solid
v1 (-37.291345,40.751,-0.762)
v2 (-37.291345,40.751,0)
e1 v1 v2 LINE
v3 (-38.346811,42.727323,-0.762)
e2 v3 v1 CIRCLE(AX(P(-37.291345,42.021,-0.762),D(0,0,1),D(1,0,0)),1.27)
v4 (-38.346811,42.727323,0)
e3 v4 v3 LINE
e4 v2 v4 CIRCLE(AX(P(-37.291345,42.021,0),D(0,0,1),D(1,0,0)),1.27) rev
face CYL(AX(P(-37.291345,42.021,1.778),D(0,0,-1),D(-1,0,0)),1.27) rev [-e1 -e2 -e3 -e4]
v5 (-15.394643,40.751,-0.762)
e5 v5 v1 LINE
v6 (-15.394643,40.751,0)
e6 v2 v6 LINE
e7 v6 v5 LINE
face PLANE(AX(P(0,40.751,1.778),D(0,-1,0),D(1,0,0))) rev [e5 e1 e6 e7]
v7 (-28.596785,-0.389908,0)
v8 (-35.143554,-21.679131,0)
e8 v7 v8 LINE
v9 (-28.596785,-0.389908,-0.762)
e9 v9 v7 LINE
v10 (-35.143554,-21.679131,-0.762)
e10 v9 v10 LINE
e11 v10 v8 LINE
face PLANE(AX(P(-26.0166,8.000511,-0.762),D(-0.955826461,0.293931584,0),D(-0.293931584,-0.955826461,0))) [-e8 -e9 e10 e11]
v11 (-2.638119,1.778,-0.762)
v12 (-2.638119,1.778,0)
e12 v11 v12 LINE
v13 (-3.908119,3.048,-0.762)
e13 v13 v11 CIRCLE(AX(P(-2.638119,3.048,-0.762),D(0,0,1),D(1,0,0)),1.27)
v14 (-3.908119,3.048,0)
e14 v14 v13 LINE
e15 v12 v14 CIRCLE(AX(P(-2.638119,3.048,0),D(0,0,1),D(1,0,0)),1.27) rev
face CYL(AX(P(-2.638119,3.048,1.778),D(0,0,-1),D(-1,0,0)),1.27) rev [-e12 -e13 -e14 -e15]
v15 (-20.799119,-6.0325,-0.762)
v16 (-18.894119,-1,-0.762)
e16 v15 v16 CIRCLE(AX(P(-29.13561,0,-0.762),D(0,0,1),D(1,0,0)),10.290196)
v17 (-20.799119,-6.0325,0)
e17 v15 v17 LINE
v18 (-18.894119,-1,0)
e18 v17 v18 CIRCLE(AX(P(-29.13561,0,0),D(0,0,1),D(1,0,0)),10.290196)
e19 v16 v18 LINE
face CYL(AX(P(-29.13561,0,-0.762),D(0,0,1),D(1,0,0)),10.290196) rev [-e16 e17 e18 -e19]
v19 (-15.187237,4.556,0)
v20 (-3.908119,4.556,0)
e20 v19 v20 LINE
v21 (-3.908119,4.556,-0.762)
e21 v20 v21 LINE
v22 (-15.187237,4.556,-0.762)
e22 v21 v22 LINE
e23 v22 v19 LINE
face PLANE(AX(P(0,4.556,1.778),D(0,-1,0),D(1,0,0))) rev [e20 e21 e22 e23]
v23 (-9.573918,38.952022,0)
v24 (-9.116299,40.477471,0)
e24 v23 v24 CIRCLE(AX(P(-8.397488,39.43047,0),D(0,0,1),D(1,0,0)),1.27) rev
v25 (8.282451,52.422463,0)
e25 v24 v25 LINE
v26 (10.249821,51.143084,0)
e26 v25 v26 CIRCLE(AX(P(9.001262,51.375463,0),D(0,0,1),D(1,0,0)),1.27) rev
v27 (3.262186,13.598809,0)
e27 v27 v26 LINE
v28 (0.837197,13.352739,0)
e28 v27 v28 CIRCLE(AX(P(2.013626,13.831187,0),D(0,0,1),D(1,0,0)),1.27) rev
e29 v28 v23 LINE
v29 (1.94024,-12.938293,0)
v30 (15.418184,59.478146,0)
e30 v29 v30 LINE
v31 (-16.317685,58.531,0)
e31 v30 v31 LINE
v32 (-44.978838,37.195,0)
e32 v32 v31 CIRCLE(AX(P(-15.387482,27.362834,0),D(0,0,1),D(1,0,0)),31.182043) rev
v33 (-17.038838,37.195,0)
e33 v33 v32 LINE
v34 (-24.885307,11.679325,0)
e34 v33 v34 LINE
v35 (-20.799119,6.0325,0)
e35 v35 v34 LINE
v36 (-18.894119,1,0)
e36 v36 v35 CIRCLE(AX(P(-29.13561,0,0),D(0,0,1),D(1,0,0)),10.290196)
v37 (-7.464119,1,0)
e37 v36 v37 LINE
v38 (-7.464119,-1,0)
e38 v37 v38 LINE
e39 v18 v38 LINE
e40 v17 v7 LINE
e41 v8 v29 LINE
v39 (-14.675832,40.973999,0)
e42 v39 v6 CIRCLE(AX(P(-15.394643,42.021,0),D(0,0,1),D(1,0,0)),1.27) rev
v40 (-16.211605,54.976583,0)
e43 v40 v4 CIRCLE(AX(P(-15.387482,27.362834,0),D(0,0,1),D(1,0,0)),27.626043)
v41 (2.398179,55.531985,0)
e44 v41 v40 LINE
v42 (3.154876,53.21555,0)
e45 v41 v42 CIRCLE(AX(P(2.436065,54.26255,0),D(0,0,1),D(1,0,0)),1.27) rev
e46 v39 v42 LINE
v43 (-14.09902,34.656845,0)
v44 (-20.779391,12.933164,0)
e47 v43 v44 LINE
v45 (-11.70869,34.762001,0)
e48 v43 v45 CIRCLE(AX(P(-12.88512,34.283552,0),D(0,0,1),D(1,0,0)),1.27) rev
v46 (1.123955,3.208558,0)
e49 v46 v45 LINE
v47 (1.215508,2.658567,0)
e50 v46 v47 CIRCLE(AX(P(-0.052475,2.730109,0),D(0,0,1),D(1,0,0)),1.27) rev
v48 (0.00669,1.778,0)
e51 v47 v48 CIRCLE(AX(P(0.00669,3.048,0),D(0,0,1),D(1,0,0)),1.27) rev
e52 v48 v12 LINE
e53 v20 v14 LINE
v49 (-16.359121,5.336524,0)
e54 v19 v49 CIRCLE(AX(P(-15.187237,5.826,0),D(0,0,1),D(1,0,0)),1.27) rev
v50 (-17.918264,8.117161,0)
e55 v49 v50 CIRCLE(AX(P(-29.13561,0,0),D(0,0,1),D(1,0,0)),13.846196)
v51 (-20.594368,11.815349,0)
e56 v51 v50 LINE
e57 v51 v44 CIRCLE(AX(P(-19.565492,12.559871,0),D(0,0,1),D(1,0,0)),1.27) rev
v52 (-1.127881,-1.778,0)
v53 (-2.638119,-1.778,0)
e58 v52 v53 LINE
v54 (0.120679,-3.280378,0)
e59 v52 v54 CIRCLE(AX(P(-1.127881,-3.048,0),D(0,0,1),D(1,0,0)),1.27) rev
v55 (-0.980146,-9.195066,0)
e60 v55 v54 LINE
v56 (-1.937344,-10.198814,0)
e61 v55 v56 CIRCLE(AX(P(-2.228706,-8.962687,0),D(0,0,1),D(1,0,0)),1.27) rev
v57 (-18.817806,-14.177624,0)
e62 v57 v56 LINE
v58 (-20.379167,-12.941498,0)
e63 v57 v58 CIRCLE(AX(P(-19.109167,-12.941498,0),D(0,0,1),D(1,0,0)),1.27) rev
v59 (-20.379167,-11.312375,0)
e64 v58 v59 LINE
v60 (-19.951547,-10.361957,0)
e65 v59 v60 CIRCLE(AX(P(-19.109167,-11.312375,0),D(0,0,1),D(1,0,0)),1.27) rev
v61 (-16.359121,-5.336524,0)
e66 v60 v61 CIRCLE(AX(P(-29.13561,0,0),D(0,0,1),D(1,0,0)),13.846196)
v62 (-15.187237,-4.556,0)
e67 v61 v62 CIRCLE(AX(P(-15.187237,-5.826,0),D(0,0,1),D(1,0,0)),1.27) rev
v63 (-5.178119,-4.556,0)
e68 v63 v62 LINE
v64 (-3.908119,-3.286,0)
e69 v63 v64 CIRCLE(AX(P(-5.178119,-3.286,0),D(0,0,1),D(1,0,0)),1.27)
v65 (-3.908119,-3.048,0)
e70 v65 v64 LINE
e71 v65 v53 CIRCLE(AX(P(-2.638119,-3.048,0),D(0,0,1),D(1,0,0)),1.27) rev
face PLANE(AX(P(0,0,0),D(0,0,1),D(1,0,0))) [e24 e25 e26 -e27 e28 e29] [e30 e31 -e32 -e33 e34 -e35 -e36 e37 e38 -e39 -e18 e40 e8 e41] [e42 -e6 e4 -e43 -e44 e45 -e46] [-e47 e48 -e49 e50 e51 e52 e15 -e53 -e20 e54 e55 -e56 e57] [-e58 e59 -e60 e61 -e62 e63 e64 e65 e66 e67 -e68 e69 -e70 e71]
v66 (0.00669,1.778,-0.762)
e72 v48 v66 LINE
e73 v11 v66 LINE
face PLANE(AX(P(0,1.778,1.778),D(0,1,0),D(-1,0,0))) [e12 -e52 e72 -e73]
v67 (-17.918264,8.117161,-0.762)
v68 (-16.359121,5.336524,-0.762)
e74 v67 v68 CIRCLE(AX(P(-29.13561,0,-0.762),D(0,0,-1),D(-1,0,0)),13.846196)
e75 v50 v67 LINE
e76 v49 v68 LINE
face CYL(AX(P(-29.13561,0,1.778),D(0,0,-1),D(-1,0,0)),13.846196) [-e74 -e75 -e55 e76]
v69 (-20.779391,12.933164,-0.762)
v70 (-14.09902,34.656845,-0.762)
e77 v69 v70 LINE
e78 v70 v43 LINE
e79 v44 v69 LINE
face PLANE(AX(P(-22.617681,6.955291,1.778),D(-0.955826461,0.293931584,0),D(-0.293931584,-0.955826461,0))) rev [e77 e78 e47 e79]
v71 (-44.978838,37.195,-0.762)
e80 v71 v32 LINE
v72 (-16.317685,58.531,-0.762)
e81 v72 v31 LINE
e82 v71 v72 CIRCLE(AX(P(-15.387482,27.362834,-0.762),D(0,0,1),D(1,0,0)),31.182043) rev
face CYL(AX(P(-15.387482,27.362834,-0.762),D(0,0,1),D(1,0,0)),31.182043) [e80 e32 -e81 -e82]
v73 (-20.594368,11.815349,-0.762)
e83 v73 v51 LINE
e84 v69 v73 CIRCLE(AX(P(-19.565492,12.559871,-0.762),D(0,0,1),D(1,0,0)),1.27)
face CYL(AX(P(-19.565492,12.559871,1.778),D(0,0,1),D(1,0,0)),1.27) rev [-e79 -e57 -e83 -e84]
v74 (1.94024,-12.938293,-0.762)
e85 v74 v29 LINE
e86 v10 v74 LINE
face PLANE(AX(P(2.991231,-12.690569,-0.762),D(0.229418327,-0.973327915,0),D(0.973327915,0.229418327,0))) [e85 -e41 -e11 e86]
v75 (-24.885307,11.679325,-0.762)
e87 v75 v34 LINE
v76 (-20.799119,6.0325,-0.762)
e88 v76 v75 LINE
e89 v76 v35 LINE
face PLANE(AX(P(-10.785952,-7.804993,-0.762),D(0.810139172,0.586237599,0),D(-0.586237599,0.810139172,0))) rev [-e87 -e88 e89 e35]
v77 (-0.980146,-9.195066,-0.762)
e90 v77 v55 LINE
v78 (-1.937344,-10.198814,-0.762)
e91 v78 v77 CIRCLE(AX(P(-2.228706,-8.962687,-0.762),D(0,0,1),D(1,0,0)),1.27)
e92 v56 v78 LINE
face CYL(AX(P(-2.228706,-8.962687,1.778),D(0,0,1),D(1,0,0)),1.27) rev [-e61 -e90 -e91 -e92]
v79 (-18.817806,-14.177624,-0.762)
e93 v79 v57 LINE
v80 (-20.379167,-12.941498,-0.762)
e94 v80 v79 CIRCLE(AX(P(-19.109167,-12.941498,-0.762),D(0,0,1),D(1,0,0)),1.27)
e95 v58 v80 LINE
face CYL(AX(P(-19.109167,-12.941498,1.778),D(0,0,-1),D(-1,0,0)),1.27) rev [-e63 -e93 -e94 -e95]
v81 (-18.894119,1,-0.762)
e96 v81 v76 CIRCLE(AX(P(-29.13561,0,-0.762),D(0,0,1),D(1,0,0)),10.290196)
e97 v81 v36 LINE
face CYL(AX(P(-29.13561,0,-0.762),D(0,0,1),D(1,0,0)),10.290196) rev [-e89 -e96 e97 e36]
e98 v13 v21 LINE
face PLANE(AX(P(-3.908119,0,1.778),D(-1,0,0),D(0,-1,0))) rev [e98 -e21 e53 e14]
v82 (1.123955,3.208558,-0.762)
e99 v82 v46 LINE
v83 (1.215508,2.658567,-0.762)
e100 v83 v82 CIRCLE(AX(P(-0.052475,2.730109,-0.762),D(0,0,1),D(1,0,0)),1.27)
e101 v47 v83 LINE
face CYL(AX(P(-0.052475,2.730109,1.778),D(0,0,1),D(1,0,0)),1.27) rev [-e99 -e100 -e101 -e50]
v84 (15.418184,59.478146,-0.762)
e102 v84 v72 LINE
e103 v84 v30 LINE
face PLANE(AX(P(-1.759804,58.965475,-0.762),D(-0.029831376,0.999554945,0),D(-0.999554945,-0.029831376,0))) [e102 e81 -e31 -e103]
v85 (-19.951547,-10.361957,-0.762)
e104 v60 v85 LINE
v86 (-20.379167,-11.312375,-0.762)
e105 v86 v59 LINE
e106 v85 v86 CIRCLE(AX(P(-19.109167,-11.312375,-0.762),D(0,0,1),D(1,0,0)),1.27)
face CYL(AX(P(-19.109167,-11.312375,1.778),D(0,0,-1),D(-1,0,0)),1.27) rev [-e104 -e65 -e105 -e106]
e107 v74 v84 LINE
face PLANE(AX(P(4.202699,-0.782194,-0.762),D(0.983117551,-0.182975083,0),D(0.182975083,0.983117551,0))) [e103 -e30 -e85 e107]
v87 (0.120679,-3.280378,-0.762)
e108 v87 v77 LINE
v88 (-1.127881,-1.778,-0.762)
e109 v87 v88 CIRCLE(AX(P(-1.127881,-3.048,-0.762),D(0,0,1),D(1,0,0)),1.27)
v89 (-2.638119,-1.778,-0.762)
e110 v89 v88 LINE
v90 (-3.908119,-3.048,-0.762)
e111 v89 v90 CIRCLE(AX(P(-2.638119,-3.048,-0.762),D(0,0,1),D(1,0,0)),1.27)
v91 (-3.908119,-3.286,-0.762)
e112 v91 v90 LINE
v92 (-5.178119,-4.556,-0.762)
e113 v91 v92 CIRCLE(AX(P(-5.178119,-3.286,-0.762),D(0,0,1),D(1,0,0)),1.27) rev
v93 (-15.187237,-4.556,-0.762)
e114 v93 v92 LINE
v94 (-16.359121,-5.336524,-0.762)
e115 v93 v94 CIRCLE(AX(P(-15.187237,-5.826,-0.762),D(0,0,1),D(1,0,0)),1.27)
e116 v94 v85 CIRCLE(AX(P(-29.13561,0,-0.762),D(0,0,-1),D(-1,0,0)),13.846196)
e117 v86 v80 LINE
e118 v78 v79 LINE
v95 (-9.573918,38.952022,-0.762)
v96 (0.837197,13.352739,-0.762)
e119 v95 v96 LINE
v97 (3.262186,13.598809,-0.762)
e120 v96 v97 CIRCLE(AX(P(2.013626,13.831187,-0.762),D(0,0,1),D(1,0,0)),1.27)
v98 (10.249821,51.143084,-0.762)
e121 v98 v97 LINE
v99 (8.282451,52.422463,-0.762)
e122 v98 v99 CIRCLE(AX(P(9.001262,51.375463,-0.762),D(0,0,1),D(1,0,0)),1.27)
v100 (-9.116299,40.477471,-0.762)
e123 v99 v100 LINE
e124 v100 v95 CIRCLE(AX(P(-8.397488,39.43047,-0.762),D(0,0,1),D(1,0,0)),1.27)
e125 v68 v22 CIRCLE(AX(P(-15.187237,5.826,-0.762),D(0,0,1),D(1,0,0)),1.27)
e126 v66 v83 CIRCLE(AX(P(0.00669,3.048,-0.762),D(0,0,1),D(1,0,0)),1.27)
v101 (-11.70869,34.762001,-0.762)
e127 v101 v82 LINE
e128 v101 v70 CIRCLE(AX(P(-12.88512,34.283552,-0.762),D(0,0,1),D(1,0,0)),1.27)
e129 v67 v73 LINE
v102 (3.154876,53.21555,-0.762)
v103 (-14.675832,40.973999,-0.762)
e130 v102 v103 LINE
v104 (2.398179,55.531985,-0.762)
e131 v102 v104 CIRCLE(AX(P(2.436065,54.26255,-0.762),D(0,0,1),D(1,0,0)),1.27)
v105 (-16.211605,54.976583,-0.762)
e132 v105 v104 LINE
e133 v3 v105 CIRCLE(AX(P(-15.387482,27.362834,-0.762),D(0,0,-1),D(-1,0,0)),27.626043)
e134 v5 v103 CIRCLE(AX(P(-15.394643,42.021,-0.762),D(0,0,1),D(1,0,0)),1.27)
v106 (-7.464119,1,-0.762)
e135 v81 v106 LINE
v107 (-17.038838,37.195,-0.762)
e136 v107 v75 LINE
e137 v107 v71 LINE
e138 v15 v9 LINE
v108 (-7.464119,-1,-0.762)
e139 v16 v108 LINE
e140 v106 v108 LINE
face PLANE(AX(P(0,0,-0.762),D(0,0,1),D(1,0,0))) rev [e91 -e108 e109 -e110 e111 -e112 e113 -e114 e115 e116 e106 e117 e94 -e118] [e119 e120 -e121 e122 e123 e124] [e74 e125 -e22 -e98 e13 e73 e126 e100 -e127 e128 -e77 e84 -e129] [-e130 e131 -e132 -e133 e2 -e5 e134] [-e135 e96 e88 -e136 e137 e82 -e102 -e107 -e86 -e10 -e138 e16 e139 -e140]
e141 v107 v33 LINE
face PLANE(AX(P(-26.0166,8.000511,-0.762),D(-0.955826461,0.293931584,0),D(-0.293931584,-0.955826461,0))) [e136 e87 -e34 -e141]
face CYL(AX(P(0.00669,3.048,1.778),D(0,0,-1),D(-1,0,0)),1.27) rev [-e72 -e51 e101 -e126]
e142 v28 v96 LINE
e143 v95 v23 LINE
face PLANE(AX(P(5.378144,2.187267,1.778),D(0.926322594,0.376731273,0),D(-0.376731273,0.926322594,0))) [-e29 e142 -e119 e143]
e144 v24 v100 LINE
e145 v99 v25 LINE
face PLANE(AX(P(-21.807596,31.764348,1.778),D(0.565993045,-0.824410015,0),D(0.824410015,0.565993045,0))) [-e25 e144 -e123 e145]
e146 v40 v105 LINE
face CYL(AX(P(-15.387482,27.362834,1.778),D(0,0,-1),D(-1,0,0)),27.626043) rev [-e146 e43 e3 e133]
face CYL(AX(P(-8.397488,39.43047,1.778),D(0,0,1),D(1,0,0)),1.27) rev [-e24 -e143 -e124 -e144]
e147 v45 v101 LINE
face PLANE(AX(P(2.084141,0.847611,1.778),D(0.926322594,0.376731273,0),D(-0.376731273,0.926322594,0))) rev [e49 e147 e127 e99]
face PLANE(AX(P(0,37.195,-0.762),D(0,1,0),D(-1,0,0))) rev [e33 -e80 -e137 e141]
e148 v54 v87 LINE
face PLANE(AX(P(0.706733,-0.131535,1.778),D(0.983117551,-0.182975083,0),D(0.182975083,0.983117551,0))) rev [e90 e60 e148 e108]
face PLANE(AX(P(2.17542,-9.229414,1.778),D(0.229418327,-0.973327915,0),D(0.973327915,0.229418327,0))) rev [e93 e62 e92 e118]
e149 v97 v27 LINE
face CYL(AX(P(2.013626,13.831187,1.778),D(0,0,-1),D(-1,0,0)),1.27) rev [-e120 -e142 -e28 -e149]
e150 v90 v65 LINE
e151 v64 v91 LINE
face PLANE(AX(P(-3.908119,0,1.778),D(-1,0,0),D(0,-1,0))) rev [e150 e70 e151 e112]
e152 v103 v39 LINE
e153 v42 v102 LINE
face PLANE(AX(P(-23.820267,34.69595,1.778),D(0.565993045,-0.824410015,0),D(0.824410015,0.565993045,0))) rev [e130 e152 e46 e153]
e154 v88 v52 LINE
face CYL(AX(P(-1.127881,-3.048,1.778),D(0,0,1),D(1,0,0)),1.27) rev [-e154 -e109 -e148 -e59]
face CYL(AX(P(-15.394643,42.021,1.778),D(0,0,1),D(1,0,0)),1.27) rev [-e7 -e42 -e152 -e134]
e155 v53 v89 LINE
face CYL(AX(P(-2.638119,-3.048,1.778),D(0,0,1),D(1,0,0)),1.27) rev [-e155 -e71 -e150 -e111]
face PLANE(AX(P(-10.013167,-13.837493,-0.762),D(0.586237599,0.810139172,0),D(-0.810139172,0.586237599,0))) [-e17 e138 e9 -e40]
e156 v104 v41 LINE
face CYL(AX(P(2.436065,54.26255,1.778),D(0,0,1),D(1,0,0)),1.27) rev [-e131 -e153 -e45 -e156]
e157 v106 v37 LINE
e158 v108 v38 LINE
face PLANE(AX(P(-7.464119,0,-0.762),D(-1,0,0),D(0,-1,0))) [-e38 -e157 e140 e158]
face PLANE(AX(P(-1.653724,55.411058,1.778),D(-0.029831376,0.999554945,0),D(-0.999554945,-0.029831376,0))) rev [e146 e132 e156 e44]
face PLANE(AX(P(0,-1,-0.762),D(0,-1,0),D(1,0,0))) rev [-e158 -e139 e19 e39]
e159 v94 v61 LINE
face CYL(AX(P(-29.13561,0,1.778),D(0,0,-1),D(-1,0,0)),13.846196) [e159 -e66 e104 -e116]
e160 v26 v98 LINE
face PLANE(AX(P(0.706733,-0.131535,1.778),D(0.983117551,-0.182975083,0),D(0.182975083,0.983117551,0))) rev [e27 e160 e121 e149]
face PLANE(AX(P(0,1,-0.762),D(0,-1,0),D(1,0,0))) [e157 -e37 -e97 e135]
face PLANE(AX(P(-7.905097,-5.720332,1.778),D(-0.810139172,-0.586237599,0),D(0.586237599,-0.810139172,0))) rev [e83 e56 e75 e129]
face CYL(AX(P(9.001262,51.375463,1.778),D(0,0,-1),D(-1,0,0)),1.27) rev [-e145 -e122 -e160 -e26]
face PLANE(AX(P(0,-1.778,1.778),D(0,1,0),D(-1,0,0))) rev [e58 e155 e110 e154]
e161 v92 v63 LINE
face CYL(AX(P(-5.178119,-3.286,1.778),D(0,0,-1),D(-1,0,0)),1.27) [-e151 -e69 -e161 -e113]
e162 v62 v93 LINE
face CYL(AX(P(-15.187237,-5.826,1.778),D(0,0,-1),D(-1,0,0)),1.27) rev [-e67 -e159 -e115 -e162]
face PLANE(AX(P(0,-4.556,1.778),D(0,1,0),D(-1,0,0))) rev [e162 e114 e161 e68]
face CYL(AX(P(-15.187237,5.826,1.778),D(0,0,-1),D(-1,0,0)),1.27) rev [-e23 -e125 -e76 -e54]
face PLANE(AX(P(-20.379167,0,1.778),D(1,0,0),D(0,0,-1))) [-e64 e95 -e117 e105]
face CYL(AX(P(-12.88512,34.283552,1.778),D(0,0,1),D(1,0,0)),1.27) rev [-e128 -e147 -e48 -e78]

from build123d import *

# Parameters (mm, degrees)
BOSS_EXTRUDE2_DEPTH = 0.762
CUT_EXTRUDE1_DEPTH  = 2.54
FILLET1_R           = 1.27
FILLET2_R           = 1.27


with BuildPart() as part:
    # Sketch1 → Boss-Extrude2 (new body)
    with BuildSketch(Plane.XY):
        with BuildLine():
            Line((-17.038837989, 37.195), (-24.885307058, 11.67932501))
            Line((-24.885307058, 11.67932501), (-20.799118841, 6.0325))
            ThreePointArc((-20.799118841, 6.0325), (-19.511844062, 3.642975475), (-18.894118841, 1))
            Line((-18.894118841, 1), (-7.464118841, 1))
            Line((-7.464118841, 1), (-7.464118841, -1))
            Line((-7.464118841, -1), (-18.894118841, -1))
            ThreePointArc((-18.894118841, -1), (-19.511844062, -3.642975475), (-20.799118841, -6.0325))
            Line((-20.799118841, -6.0325), (-28.596784868, -0.38990775))
            Line((-28.596784868, -0.38990775), (-35.143553898, -21.67913088))
            Line((-35.143553898, -21.67913088), (1.940239682, -12.938292607))
            Line((1.940239682, -12.938292607), (15.418184296, 59.478146197))
            Line((15.418184296, 59.478146197), (-16.317685222, 58.531))
            ThreePointArc((-16.317685222, 58.531), (-34.007299879, 52.375275454), (-44.978837989, 37.195))
            Line((-44.978837989, 37.195), (-17.038837989, 37.195))
        make_face()
    extrude(amount=-BOSS_EXTRUDE2_DEPTH)

    # Sketch2 → Cut-Extrude1 (cut)
    with BuildSketch(Plane(origin=(0, 0, -0.762), x_dir=(-1, 0, 0), z_dir=(0, 0, -1))):
        Polygon((9.959013349, 39.898911244), (-10.811031118, 54.15844292), (-2.469426207, 9.339344835), align=None)
        with BuildLine():
            Line((16.211604848, 54.976582614), (-6.716661044, 55.660868886))
            Line((-6.716661044, 55.660868886), (15.000646844, 40.751))
            Line((15.000646844, 40.751), (39.552648945, 40.751))
            ThreePointArc((39.552648945, 40.751), (29.764823586, 50.952881409), (16.211604848, 54.976582614))
        make_face()
        with BuildLine():
            Line((13.163553789, 37.698855968), (12.959946202, 37.838641361))
            Line((12.959946202, 37.838641361), (-1.264200274, 2.863715758))
            Line((-1.264200274, 2.863715758), (-1.0621299, 1.778))
            Line((-1.0621299, 1.778), (3.908118841, 1.778))
            Line((3.908118841, 1.778), (3.908118841, 4.556))
            Line((3.908118841, 4.556), (16.060442021, 4.556))
            ThreePointArc((16.060442021, 4.556), (16.85953464, 6.404305379), (17.918263947, 8.117160903))
            Line((17.918263947, 8.117160903), (20.965443108, 12.328148402))
            Line((20.965443108, 12.328148402), (13.163553789, 37.698855968))
        make_face()
        with BuildLine():
            Line((3.908118841, -1.778), (-0.400297147, -1.778))
            Line((-0.400297147, -1.778), (1.131614758, -10.008899288))
            Line((1.131614758, -10.008899288), (20.37916729, -14.545645063))
            Line((20.37916729, -14.545645063), (20.37916729, -10.725757063))
            ThreePointArc((20.37916729, -10.725757063), (17.792273547, -7.940143054), (16.060442021, -4.556))
            Line((16.060442021, -4.556), (3.908118841, -4.556))
            Line((3.908118841, -4.556), (3.908118841, -1.778))
        make_face()
    extrude(amount=-CUT_EXTRUDE1_DEPTH, mode=Mode.SUBTRACT)

    # Fillet1
    # the kernel refuses this fillet: 1.27 mm, written as the material it adds along each edge
    with BuildSketch(Plane(origin=(-39.552648945, 40.751, -0.762), x_dir=(0.5208478104072599, 0.8536495524475856, 0), z_dir=(0, 0, 1))) as fillet1_piece_1:
        with BuildLine():
            CenterArc((2.261930285, -1.268884618), FILLET1_R, 87.598517958, 123.790620182)
            Line((1.177795353, -1.930361337), (0, 0))
            ThreePointArc((0, 0), (1.157572593, 0.024262667), (2.315145186, 0))
        make_face()
    extrude(amount=0.762)
    with BuildSketch(Plane(origin=(-15.000646844, 40.751, -0.762), x_dir=(-1, 0, 0), z_dir=(0, 0, 1))) as fillet1_piece_2:
        with BuildLine():
            CenterArc((FILLET1_R * 0.310233467687, -FILLET1_R), FILLET1_R, 90, 34.471278604)
            Line((-FILLET1_R * 0.2557595777, -FILLET1_R * 0.175589985157), (0, 0))
            Line((0, 0), (FILLET1_R * 0.310233467687, 0))
        make_face()
    extrude(amount=0.762)
    with BuildSketch(Plane(origin=(6.716661044, 55.660868886, -0.762), x_dir=(-0.9995549454578584, -0.029831376279645935, 0), z_dir=(0, 0, 1))) as fillet1_piece_3:
        with BuildLine():
            CenterArc((FILLET1_R * 3.40189361791, FILLET1_R), FILLET1_R, 122.761813037, 147.238186963)
            Line((FILLET1_R * 2.86074575566, FILLET1_R * 1.84092745893), (0, 0))
            Line((0, 0), (FILLET1_R * 3.40189361791, 0))
        make_face()
    extrude(amount=0.762)
    with BuildSketch(Plane(origin=(-16.060442021, -4.556, -0.762), x_dir=(1, 0, 0), z_dir=(0, 0, 1))) as fillet1_piece_4:
        with BuildLine():
            CenterArc((0.873205275, -1.27), FILLET1_R, 90, 67.330529822)
            ThreePointArc((-0.298679081, -0.780523691), (-0.143449411, -0.392515792), (0, 0))
            Line((0, 0), (0.873205275, 0))
        make_face()
    extrude(amount=0.762)
    with BuildSketch(Plane(origin=(-20.37916729, -10.725757063, -0.762), x_dir=(0.7616549867095258, 0.6479827784906881, 0), z_dir=(0, 0, 1))) as fillet1_piece_5:
        with BuildLine():
            CenterArc((0.587183206, -1.269738966), FILLET1_R, 91.161693546, 48.448622341)
            Line((-0.380118627, -0.446800838), (0, 0))
            ThreePointArc((0, 0), (0.28071762, -0.002845925), (0.561435241, 0))
        make_face()
    extrude(amount=0.762)
    with BuildSketch(Plane(origin=(-20.37916729, -14.545645063, -0.762), x_dir=(0, 1, 0), z_dir=(0, 0, 1))) as fillet1_piece_6:
        with BuildLine():
            CenterArc((FILLET1_R * 1.26310805209, -FILLET1_R), FILLET1_R, 90, 103.262828677)
            Line((FILLET1_R * 0.289780136608, -FILLET1_R * 1.22941832738), (0, 0))
            Line((0, 0), (FILLET1_R * 1.26310805209, 0))
        make_face()
    extrude(amount=0.762)
    with BuildSketch(Plane(origin=(-1.131614758, -10.008899288, -0.762), x_dir=(-0.9733279154855742, -0.22941832737710197, 0), z_dir=(0, 0, 1))) as fillet1_piece_7:
        with BuildLine():
            CenterArc((FILLET1_R * 0.651818100075, -FILLET1_R), FILLET1_R, 90, 66.194073158)
            Line((-FILLET1_R * 0.263099818984, -FILLET1_R * 0.596360059726), (0, 0))
            Line((0, 0), (FILLET1_R * 0.651818100075, 0))
        make_face()
    extrude(amount=0.762)
    with BuildSketch(Plane(origin=(0.400297147, -1.778, -0.762), x_dir=(-1, 0, 0), z_dir=(0, 0, 1))) as fillet1_piece_8:
        with BuildLine():
            CenterArc((FILLET1_R * 1.20328955763, FILLET1_R), FILLET1_R, 169.456901836, 100.543098164)
            Line((FILLET1_R * 0.220172006676, FILLET1_R * 1.182975083), (0, 0))
            Line((0, 0), (FILLET1_R * 1.20328955763, 0))
        make_face()
    extrude(amount=0.762)
    with BuildSketch(Plane(origin=(-3.908118841, -1.778, -0.762), x_dir=(1, 0, 0), z_dir=(0, 0, 1)), Plane(origin=(-3.908118841, 1.778, -0.762), x_dir=(0, 1, 0), z_dir=(0, 0, 1))) as fillet1_piece_9:
        with BuildLine():
            CenterArc((FILLET1_R, -FILLET1_R), FILLET1_R, 90, 90)
            Line((0, -FILLET1_R), (0, 0))
            Line((0, 0), (FILLET1_R, 0))
        make_face()
    extrude(amount=0.762)
    with BuildSketch(Plane(origin=(10.811031118, 54.15844292, -0.762), x_dir=(-0.8244100148431994, -0.5659930453868101, 0), z_dir=(0, 0, 1))) as fillet1_piece_10:
        with BuildLine():
            CenterArc((FILLET1_R * 2.41507052303, FILLET1_R), FILLET1_R, 134.985623232, 135.014376768)
            Line((FILLET1_R * 1.7081411927, FILLET1_R * 1.70728418753), (0, 0))
            Line((0, 0), (FILLET1_R * 2.41507052303, 0))
        make_face()
    extrude(amount=0.762)
    with BuildSketch(Plane(origin=(-9.959013349, 39.898911244, -0.762), x_dir=(0.824410014843199, 0.5659930453868107, 0), z_dir=(0, 0, 1))) as fillet1_piece_11:
        with BuildLine():
            CenterArc((FILLET1_R * 0.804884205906, -FILLET1_R), FILLET1_R, 90, 77.660077981)
            Line((-FILLET1_R * 0.172012698042, -FILLET1_R * 0.786288888787), (0, 0))
            Line((0, 0), (FILLET1_R * 0.804884205906, 0))
        make_face()
    extrude(amount=0.762)
    with BuildSketch(Plane(origin=(2.469426207, 9.339344835, -0.762), x_dir=(-0.37673127332714895, 0.9263225937530105, 0), z_dir=(0, 0, 1))) as fillet1_piece_12:
        with BuildLine():
            CenterArc((FILLET1_R * 3.41150341271, -FILLET1_R), FILLET1_R, 90, 147.325545251)
            Line((FILLET1_R * 2.87163833244, -FILLET1_R * 1.84175156376), (0, 0))
            Line((0, 0), (FILLET1_R * 3.41150341271, 0))
        make_face()
    extrude(amount=0.762)
    with BuildSketch(Plane(origin=(-16.060442021, 4.556, -0.762), x_dir=(-0.35739171022603367, 0.9339545842607717, 0), z_dir=(0, 0, 1))) as fillet1_piece_13:
        with BuildLine():
            CenterArc((0.874045995, -1.269421541), FILLET1_R, 91.729372014, 67.330529822)
            Line((-0.312076327, -0.815534069), (0, 0))
            ThreePointArc((0, 0), (0.417859553, -0.006306655), (0.835719106, 0))
        make_face()
    extrude(amount=0.762)
    with BuildSketch(Plane(origin=(1.0621299, 1.778, -0.762), x_dir=(-1, 0, 0), z_dir=(0, 0, 1))) as fillet1_piece_14:
        with BuildLine():
            CenterArc((FILLET1_R * 0.831055163452, -FILLET1_R), FILLET1_R, 90, 79.456901836)
            Line((-FILLET1_R * 0.152062387507, -FILLET1_R * 0.817024917004), (0, 0))
            Line((0, 0), (FILLET1_R * 0.831055163452, 0))
        make_face()
    extrude(amount=0.762)
    with BuildSketch(Plane(origin=(1.264200274, 2.863715758, -0.762), x_dir=(-0.18297508299575613, -0.9831175509585292, 0), z_dir=(0, 0, 1))) as fillet1_piece_15:
        with BuildLine():
            CenterArc((FILLET1_R * 0.293125897595, -FILLET1_R), FILLET1_R, 90, 32.674454749)
            Line((-FILLET1_R * 0.24673918268, -FILLET1_R * 0.158248436236), (0, 0))
            Line((0, 0), (FILLET1_R * 0.293125897595, 0))
        make_face()
    extrude(amount=0.762)
    with BuildSketch(Plane(origin=(-13.163553789, 37.698855968, -0.762), x_dir=(0.8244100148432169, 0.5659930453867846, 0), z_dir=(0, 0, 1))) as fillet1_piece_16:
        with BuildLine():
            CenterArc((0.466869862, -1.250818003), FILLET1_R, 99.970819011, 28.464420859)
            Line((-0.322599825, -0.256012688), (0, 0))
            Line((0, 0), (0.246973695, 0))
        make_face()
    extrude(amount=0.762)
    with BuildSketch(Plane(origin=(-20.965443108, 12.328148402, -0.762), x_dir=(0.29393158388003876, 0.9558264612353917, 0), z_dir=(0, 0, 1))) as fillet1_piece_17:
        with BuildLine():
            CenterArc((FILLET1_R * 0.49840674513, -FILLET1_R), FILLET1_R, 90, 52.983950443)
            Line((-FILLET1_R * 0.300060154598, -FILLET1_R * 0.397961288587), (0, 0))
            Line((0, 0), (FILLET1_R * 0.49840674513, 0))
        make_face()
    extrude(amount=0.762)
    # the kernel refuses this fillet: 1.27 mm, written as the material it takes off along each edge
    with BuildSketch(Plane(origin=(-3.908118841, -4.556, -3.937), x_dir=(0, 1, 0), z_dir=(0, 0, 1))) as fillet1_2_piece_1:
        with BuildLine():
            CenterArc((FILLET1_R, FILLET1_R), FILLET1_R, 180, 90)
            Line((0, FILLET1_R), (0, 0))
            Line((0, 0), (FILLET1_R, 0))
        make_face()
    extrude(amount=7.112, mode=Mode.SUBTRACT)

    # Fillet2
    # the kernel refuses this fillet: 1.27 mm, written as the material it adds along each edge
    with BuildSketch(Plane(origin=(-12.959946202, 37.838641361, -0.762), x_dir=(-0.33704949641536375, -0.9414869287282484, 0), z_dir=(0, 0, 1))) as fillet2_piece_1:
        with BuildLine():
            CenterArc((3.321849705, 1.268688867), FILLET2_R, 131.828571636, 140.775161889)
            Line((2.474881455, 2.215021147), (2.390184631, 2.309654375))
            Line((2.390184631, 2.309654375), (-0.084696825, 0.094633228))
            Line((-0.084696825, 0.094633228), (-0.055395427, -0.114281874))
            ThreePointArc((-0.055395427, -0.114281874), (0.617417306, -0.252739018), (3.385312737, -0.126868887))
            Line((3.385312737, -0.126868887), (3.37954337, 0))
        make_face()
    extrude(amount=0.762)


solid = part.part
